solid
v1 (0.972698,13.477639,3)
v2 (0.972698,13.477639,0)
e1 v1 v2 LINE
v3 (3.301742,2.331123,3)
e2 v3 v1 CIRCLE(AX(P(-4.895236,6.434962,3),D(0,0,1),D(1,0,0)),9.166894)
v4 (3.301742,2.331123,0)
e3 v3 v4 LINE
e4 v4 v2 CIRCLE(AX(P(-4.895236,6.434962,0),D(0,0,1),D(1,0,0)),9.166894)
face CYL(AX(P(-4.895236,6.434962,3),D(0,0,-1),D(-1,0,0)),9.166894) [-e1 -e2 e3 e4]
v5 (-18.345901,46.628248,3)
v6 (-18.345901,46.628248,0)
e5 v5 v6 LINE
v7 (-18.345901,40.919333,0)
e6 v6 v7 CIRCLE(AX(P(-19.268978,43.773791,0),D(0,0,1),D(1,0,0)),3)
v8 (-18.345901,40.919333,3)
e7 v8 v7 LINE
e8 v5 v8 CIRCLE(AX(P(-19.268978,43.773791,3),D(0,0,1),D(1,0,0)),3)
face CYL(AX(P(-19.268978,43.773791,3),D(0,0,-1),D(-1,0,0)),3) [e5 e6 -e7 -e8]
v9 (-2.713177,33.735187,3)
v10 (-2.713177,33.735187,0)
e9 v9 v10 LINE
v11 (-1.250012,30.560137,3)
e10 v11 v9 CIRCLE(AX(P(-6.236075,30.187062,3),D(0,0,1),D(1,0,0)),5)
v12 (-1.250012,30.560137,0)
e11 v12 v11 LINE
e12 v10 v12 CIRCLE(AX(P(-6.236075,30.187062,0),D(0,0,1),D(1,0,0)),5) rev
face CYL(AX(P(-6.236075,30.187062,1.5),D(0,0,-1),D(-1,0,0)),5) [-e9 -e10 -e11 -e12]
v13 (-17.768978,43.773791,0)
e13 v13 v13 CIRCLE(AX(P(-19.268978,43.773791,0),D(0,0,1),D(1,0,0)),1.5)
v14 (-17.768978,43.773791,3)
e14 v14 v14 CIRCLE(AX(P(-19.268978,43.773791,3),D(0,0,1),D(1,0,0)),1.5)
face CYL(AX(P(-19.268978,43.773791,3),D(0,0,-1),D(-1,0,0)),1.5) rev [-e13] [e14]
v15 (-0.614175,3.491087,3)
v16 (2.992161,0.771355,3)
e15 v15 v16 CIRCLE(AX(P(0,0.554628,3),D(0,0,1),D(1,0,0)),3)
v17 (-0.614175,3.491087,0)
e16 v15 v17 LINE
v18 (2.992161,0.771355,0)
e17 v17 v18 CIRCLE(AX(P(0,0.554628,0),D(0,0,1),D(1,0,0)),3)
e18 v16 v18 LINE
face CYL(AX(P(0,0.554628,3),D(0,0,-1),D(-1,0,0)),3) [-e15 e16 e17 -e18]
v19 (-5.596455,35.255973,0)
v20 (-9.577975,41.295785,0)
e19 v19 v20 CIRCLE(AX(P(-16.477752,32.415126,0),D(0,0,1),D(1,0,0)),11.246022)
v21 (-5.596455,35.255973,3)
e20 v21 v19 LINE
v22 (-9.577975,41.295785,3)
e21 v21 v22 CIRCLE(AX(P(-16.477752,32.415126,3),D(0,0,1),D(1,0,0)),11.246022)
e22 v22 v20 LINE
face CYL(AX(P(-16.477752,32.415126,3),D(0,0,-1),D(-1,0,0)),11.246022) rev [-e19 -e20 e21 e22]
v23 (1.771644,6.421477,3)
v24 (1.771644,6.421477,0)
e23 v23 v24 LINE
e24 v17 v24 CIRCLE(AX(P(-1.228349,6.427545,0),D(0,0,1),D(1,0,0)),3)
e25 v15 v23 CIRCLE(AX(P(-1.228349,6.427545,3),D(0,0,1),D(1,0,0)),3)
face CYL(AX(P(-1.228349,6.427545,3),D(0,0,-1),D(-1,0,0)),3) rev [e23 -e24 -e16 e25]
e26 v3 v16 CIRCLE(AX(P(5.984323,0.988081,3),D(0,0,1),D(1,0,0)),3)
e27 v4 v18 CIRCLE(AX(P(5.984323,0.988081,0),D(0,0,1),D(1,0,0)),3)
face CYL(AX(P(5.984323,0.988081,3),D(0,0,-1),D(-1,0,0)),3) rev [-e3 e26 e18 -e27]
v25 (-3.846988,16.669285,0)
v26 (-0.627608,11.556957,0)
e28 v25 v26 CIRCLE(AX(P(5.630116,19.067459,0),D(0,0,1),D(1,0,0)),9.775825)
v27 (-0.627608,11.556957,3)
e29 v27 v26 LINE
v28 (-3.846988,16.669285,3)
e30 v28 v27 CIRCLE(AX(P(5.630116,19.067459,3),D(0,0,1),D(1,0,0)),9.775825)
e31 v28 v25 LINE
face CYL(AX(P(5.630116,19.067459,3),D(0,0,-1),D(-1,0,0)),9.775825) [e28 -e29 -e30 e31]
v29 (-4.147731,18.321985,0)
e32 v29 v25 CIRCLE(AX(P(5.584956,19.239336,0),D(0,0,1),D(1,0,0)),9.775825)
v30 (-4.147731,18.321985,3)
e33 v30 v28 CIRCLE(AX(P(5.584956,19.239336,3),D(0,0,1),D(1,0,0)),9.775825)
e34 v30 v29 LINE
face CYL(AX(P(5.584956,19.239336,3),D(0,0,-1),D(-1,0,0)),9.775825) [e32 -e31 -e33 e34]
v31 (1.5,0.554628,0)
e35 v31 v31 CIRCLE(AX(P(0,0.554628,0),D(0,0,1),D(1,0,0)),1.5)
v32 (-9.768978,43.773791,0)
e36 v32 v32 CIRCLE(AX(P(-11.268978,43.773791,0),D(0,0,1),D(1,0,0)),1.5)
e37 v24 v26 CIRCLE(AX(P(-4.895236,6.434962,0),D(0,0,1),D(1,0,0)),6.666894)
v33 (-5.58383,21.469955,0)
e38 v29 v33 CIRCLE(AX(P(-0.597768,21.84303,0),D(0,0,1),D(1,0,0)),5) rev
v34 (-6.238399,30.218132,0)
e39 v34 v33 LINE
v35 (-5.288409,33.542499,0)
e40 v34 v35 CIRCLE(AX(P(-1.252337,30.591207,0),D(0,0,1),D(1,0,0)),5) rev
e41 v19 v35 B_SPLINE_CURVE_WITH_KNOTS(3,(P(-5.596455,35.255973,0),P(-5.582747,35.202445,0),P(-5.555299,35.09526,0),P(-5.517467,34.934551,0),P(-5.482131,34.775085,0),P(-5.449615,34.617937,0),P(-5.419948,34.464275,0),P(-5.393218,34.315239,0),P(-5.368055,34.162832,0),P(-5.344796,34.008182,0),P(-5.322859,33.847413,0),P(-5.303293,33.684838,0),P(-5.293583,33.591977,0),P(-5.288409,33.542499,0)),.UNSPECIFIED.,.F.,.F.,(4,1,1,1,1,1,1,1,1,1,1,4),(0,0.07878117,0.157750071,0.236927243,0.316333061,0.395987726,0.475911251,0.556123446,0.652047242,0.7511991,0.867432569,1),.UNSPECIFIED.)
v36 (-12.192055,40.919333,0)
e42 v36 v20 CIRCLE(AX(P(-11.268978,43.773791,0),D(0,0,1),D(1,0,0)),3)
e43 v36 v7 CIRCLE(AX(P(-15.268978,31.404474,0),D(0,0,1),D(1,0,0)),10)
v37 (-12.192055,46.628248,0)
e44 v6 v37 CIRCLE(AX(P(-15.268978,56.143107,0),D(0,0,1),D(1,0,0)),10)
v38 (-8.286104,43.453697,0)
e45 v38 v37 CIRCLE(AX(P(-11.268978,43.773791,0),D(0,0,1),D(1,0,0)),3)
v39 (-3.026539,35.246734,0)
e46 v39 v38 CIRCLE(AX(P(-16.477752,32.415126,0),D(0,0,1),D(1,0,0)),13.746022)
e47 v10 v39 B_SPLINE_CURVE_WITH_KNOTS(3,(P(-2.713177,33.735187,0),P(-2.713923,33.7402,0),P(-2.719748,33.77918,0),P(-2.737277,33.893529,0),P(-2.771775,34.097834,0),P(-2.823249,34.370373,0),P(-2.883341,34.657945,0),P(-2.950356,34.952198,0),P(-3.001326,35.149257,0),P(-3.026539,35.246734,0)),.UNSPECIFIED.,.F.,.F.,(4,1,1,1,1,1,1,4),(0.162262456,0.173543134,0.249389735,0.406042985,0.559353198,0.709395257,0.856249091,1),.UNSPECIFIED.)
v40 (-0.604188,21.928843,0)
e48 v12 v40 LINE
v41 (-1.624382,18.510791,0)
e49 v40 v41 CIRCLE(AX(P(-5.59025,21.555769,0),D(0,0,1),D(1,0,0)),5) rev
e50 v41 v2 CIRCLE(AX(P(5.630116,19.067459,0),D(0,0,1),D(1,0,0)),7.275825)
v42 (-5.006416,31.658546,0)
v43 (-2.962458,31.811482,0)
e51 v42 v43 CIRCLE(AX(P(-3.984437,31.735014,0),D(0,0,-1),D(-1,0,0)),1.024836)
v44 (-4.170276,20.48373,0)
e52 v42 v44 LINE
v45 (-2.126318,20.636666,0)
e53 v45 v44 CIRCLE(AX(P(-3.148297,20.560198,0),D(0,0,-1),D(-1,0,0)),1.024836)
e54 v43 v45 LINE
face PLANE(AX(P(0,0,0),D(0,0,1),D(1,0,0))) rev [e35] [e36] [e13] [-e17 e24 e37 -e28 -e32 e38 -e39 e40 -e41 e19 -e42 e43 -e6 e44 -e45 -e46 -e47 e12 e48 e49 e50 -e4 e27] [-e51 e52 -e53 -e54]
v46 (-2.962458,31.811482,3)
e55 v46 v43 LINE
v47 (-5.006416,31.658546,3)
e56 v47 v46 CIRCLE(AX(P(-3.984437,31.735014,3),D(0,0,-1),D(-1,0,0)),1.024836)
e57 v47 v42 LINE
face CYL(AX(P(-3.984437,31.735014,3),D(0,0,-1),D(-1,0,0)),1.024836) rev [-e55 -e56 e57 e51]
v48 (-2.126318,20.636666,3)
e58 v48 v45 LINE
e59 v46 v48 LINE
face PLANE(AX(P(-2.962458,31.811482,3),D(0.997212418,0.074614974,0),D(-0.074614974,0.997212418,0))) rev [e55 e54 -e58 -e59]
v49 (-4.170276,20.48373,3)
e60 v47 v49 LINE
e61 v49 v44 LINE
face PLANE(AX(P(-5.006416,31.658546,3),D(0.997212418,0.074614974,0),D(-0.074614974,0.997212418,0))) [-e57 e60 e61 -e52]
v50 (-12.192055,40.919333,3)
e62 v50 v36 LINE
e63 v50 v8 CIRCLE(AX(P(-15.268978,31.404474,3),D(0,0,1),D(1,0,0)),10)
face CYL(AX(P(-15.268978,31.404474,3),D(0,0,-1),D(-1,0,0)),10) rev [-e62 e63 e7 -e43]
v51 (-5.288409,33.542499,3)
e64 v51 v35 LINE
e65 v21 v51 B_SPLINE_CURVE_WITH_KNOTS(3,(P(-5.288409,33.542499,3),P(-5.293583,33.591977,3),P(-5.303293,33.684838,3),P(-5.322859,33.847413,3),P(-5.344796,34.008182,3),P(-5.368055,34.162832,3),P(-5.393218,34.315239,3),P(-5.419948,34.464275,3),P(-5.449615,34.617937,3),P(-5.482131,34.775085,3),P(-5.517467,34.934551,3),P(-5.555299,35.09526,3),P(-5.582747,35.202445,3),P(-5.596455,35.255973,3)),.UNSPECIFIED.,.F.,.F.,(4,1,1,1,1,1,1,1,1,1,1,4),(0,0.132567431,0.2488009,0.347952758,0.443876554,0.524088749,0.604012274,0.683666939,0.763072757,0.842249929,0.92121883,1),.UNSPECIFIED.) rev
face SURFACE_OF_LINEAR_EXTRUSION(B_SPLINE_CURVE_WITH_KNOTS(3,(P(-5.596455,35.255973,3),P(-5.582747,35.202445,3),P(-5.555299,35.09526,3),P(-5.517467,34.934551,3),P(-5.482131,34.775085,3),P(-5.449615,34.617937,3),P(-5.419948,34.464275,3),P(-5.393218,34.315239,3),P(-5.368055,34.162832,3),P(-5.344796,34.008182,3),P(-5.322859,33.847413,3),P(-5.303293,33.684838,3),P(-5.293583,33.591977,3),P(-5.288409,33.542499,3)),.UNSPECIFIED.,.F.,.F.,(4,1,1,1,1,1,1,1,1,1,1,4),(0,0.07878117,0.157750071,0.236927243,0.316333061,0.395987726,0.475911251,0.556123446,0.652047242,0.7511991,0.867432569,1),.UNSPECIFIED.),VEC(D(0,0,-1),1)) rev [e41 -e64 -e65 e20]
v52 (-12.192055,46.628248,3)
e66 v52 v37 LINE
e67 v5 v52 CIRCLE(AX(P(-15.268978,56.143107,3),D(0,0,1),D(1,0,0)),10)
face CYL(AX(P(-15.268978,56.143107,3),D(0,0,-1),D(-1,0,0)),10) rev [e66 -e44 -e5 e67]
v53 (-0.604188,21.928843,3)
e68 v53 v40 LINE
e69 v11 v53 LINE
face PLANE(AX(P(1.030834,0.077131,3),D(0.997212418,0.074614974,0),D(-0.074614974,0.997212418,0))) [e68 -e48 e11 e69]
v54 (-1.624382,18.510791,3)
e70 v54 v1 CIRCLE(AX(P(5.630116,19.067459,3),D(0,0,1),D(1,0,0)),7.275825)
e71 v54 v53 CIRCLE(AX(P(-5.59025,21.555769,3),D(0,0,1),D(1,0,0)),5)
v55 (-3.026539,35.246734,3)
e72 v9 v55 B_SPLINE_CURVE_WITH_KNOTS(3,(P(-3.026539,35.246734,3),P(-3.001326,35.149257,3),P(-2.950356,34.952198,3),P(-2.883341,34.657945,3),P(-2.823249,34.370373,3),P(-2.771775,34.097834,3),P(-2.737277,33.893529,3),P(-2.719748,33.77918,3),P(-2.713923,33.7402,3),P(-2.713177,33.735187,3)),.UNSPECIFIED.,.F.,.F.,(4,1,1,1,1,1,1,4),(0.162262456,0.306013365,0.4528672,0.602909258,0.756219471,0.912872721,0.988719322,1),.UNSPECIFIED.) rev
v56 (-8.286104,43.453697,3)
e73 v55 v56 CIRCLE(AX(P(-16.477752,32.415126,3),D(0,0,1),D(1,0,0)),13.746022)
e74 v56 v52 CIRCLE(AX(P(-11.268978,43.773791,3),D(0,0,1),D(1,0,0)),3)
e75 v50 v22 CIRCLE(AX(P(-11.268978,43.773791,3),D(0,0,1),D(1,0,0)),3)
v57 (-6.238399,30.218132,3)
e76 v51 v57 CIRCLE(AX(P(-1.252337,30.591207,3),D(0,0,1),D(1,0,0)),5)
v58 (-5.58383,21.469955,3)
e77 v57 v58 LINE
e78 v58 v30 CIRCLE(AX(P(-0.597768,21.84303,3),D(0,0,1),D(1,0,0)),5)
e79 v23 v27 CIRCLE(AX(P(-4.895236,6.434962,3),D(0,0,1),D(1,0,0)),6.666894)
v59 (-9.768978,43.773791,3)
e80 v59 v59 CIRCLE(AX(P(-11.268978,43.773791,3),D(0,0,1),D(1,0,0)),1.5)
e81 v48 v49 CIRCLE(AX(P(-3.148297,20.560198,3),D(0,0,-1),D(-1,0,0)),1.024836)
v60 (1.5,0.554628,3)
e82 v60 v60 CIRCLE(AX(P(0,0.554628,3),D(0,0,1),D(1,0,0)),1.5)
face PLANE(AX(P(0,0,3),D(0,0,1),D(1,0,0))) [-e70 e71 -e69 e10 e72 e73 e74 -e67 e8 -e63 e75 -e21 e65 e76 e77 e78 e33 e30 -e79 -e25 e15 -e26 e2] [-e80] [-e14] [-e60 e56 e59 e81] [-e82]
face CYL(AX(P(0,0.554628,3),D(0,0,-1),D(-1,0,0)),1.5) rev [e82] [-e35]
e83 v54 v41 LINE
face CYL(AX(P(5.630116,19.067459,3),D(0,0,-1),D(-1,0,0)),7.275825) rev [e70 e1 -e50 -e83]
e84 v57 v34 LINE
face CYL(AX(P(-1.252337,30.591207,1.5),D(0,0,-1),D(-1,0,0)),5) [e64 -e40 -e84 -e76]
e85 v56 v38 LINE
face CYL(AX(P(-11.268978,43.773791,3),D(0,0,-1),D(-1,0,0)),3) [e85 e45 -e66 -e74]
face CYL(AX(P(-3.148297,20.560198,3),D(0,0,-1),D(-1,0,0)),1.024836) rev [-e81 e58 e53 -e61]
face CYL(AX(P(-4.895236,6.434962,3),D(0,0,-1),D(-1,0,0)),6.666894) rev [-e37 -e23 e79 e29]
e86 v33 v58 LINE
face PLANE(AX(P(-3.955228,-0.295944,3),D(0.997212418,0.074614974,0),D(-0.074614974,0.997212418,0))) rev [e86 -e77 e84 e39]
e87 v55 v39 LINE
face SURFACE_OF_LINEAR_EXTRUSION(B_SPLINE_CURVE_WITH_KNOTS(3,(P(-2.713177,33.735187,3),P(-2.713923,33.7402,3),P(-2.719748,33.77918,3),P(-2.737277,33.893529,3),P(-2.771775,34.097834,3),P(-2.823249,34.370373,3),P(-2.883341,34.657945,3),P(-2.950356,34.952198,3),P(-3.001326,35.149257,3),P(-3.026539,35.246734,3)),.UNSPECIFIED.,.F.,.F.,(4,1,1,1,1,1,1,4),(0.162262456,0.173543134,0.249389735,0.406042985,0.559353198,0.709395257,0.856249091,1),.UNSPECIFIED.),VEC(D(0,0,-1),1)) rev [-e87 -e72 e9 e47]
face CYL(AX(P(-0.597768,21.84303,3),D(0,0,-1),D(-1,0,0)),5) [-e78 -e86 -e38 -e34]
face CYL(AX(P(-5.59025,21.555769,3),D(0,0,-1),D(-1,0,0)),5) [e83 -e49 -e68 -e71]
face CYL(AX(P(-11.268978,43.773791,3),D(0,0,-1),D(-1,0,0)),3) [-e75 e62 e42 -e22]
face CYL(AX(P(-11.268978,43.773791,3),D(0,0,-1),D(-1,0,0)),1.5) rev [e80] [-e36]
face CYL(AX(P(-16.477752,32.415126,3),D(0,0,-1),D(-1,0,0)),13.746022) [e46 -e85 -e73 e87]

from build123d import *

# Parameters (mm, degrees)
BOSS_EXTRUDE1_OUTLINE_R = 1.5
BOSS_EXTRUDE1_DEPTH     = 3
FILLET1_R               = 5
CUT_EXTRUDE1_DEPTH      = 3


# Read off the part's stored shape, not the designer's step: Boss-Extrude1
with BuildPart() as part:
    # Boss-Extrude1 outline → Boss-Extrude1 (new body)
    with BuildSketch(Plane.XY):
        with BuildLine():
            ThreePointArc((-9.577975431, 41.29578544), (-7.088317742, 38.60475873), (-5.596455347, 35.255972867))
            add(Edge.make_bspline(
                [(-5.596455347, 35.255972867), (-5.582747417, 35.202444502), (-5.55529889, 35.095260217), (-5.517467472, 34.934551052), (-5.482131356, 34.775084793), (-5.449615345, 34.617937051), (-5.419947602, 34.464275495), (-5.393218029, 34.315238656), (-5.368054814, 34.162831666), (-5.344795736, 34.008181607), (-5.322858552, 33.847412998), (-5.30329297, 33.684837729), (-5.293582635, 33.591977311), (-5.288408722, 33.542498925)],
                knots=[0, 0, 0, 0, 0.07878117, 0.157750071, 0.236927243, 0.316333061, 0.395987726, 0.475911251, 0.556123446, 0.652047242, 0.7511991, 0.867432569, 1, 1, 1, 1], degree=3))
            Line((-5.288408722, 33.542498925), (-6.480466419, 33.453304935))
            Line((-6.480466419, 33.453304935), (-5.341603358, 18.232655185))
            Line((-5.341603358, 18.232655185), (-4.147731483, 18.321984917))
            ThreePointArc((-4.147731483, 18.321984917), (-4.032924942, 17.489163116), (-3.846988472, 16.66928488))
            ThreePointArc((-3.846988472, 16.66928488), (-2.642137665, 13.858181692), (-0.627607898, 11.55695671))
            ThreePointArc((-0.627607898, 11.55695671), (1.144975693, 9.256897759), (1.771644479, 6.421477156))
            ThreePointArc((1.771644479, 6.421477156), (1.098096567, 4.533436187), (-0.614174692, 3.491086617))
            ThreePointArc((-0.614174692, 3.491086617), (-1.806361188, -1.840587951), (2.992161355, 0.771354572))
            ThreePointArc((2.992161355, 0.771354572), (3.041722898, 1.572124284), (3.301741951, 2.331122684))
            ThreePointArc((3.301741951, 2.331122684), (4.077870779, 8.309876297), (0.972698011, 13.47763914))
            ThreePointArc((0.972698011, 13.47763914), (-0.835685645, 15.731138378), (-1.624382222, 18.510790869))
            Line((-1.624382222, 18.510790869), (-0.35554127, 18.605730055))
            Line((-0.35554127, 18.605730055), (-1.494404331, 33.826379806))
            Line((-1.494404331, 33.826379806), (-2.713176612, 33.735186936))
            add(Edge.make_bspline(
                [(-2.713176612, 33.735186936), (-2.713923066, 33.740199809), (-2.719747517, 33.779179521), (-2.737276775, 33.893529306), (-2.771774985, 34.097834296), (-2.823249297, 34.37037297), (-2.883340819, 34.657944683), (-2.950356176, 34.952197534), (-3.001326008, 35.14925666), (-3.026538809, 35.246734176)],
                knots=[0.162262456, 0.162262456, 0.162262456, 0.162262456, 0.173543134, 0.249389735, 0.406042985, 0.559353198, 0.709395257, 0.856249091, 1, 1, 1, 1], degree=3))
            ThreePointArc((-3.026538809, 35.246734176), (-4.904423993, 39.832081027), (-8.286103826, 43.453696691))
            ThreePointArc((-8.286103826, 43.453696691), (-9.376853546, 46.101850718), (-12.192055187, 46.62824831))
            ThreePointArc((-12.192055187, 46.62824831), (-15.268978264, 46.143107446), (-18.345901341, 46.62824831))
            ThreePointArc((-18.345901341, 46.62824831), (-22.268978264, 43.77379057), (-18.345901341, 40.919332829))
            ThreePointArc((-18.345901341, 40.919332829), (-15.268978264, 41.404473693), (-12.192055187, 40.919332829))
            ThreePointArc((-12.192055187, 40.919332829), (-10.841360803, 40.804423077), (-9.577975431, 41.29578544))
        make_face()
        with Locations((0, 0.55462796)):
            Circle(BOSS_EXTRUDE1_OUTLINE_R, mode=Mode.SUBTRACT)
        with Locations((-19.268978264, 43.773790569)):
            Circle(BOSS_EXTRUDE1_OUTLINE_R, mode=Mode.SUBTRACT)
        with Locations((-11.268978264, 43.773790569)):
            Circle(BOSS_EXTRUDE1_OUTLINE_R, mode=Mode.SUBTRACT)
    extrude(amount=BOSS_EXTRUDE1_DEPTH)

    # Fillet1
    # the kernel refuses this fillet: 5 mm, written as the material it takes off along each edge
    with BuildSketch(Plane(origin=(-6.480466419, 33.453304935, -8.110541878), x_dir=(0.9972124174989766, 0.07461497427357966, 0), z_dir=(0, 0, 1))) as fillet1_piece_1:
        with BuildLine():
            CenterArc((4.999999999, -3.244216752), FILLET1_R, 139.545547884, 40.454452104)
            Line((-1e-09, -3.244216751), (-0.100000001, -3.244216751))
            Line((-0.100000001, -3.244216751), (-0.1, 0))
            Line((-0.1, 0), (0, 0.1))
            ThreePointArc((0, 0.1), (0.597694973, 0.1), (1.119297744, 0.064884335))
            Line((1.119297744, 0.064884335), (1.195389945, 0))
        make_face()
    extrude(amount=19.221083756, mode=Mode.SUBTRACT)
    with BuildSketch(Plane(origin=(-1.494404331, 33.826379806, -8.188433173), x_dir=(0.07461497405549736, -0.9972124175152941, 0), z_dir=(0, 0, 1))) as fillet1_piece_2:
        with BuildLine():
            CenterArc((3.275373269, -5), FILLET1_R, 90, 40.925310843)
            Line((0, -1.222179206), (-0.065507465, -1.14662279))
            ThreePointArc((-0.065507465, -1.14662279), (-0.1, -0.611089603), (-0.1, 0))
            Line((-0.1, 0), (0, 0.1))
            Line((0, 0.1), (3.275373269, 0.1))
            Line((3.275373269, 0.1), (3.275373269, 0))
        make_face()
    extrude(amount=19.376866346, mode=Mode.SUBTRACT)
    with BuildSketch(Plane(origin=(-5.341603358, 18.232655185, -8.115872597), x_dir=(-0.07461497406037235, 0.9972124175149295, 0), z_dir=(0, 0, 1))) as fillet1_piece_3:
        with BuildLine():
            CenterArc((3.246349039, -5), FILLET1_R, 90, 40.486571122)
            Line((-1e-09, -1.197209194), (-0.064926982, -1.121153378))
            ThreePointArc((-0.064926982, -1.121153378), (-0.1, -0.598604597), (-0.1, 0))
            Line((-0.1, 0), (0, 0.1))
            Line((0, 0.1), (3.246349039, 0.1))
            Line((3.246349039, 0.1), (3.246349039, 0))
        make_face()
    extrude(amount=19.231745194, mode=Mode.SUBTRACT)
    with BuildSketch(Plane(origin=(-0.35554127, 18.605730055, -8.33100668), x_dir=(-0.9972124174875004, -0.07461497442695494, 0), z_dir=(0, 0, 1))) as fillet1_piece_4:
        with BuildLine():
            CenterArc((4.999999999, -3.332402674), FILLET1_R, 138.203991534, 41.796008444)
            Line((-1e-09, -3.332402672), (-0.100000001, -3.332402672))
            Line((-0.100000001, -3.332402672), (-0.1, 0))
            Line((-0.1, 0), (0, 0.1))
            ThreePointArc((0, 0.1), (0.636193919, 0.1), (1.197835595, 0.066648053))
            Line((1.197835595, 0.066648053), (1.272387838, 0))
        make_face()
    extrude(amount=19.662013359, mode=Mode.SUBTRACT)

    # Sketch2 → Cut-Extrude1 (cut)
    with BuildSketch(Plane(origin=(0, 0, 0), x_dir=(-1, 0, 0), z_dir=(0, 0, -1))):
        with BuildLine():
            Line((5.006415896, 31.658546167), (4.17027649, 20.483730275))
            ThreePointArc((4.17027649, 20.483730275), (3.071829301, 19.538219294), (2.12631832, 20.636666483))
            Line((2.12631832, 20.636666483), (2.962457726, 31.811482375))
            ThreePointArc((2.962457726, 31.811482375), (4.060904915, 32.756993356), (5.006415896, 31.658546167))
        make_face()
    extrude(amount=-CUT_EXTRUDE1_DEPTH, mode=Mode.SUBTRACT)


solid = part.part
